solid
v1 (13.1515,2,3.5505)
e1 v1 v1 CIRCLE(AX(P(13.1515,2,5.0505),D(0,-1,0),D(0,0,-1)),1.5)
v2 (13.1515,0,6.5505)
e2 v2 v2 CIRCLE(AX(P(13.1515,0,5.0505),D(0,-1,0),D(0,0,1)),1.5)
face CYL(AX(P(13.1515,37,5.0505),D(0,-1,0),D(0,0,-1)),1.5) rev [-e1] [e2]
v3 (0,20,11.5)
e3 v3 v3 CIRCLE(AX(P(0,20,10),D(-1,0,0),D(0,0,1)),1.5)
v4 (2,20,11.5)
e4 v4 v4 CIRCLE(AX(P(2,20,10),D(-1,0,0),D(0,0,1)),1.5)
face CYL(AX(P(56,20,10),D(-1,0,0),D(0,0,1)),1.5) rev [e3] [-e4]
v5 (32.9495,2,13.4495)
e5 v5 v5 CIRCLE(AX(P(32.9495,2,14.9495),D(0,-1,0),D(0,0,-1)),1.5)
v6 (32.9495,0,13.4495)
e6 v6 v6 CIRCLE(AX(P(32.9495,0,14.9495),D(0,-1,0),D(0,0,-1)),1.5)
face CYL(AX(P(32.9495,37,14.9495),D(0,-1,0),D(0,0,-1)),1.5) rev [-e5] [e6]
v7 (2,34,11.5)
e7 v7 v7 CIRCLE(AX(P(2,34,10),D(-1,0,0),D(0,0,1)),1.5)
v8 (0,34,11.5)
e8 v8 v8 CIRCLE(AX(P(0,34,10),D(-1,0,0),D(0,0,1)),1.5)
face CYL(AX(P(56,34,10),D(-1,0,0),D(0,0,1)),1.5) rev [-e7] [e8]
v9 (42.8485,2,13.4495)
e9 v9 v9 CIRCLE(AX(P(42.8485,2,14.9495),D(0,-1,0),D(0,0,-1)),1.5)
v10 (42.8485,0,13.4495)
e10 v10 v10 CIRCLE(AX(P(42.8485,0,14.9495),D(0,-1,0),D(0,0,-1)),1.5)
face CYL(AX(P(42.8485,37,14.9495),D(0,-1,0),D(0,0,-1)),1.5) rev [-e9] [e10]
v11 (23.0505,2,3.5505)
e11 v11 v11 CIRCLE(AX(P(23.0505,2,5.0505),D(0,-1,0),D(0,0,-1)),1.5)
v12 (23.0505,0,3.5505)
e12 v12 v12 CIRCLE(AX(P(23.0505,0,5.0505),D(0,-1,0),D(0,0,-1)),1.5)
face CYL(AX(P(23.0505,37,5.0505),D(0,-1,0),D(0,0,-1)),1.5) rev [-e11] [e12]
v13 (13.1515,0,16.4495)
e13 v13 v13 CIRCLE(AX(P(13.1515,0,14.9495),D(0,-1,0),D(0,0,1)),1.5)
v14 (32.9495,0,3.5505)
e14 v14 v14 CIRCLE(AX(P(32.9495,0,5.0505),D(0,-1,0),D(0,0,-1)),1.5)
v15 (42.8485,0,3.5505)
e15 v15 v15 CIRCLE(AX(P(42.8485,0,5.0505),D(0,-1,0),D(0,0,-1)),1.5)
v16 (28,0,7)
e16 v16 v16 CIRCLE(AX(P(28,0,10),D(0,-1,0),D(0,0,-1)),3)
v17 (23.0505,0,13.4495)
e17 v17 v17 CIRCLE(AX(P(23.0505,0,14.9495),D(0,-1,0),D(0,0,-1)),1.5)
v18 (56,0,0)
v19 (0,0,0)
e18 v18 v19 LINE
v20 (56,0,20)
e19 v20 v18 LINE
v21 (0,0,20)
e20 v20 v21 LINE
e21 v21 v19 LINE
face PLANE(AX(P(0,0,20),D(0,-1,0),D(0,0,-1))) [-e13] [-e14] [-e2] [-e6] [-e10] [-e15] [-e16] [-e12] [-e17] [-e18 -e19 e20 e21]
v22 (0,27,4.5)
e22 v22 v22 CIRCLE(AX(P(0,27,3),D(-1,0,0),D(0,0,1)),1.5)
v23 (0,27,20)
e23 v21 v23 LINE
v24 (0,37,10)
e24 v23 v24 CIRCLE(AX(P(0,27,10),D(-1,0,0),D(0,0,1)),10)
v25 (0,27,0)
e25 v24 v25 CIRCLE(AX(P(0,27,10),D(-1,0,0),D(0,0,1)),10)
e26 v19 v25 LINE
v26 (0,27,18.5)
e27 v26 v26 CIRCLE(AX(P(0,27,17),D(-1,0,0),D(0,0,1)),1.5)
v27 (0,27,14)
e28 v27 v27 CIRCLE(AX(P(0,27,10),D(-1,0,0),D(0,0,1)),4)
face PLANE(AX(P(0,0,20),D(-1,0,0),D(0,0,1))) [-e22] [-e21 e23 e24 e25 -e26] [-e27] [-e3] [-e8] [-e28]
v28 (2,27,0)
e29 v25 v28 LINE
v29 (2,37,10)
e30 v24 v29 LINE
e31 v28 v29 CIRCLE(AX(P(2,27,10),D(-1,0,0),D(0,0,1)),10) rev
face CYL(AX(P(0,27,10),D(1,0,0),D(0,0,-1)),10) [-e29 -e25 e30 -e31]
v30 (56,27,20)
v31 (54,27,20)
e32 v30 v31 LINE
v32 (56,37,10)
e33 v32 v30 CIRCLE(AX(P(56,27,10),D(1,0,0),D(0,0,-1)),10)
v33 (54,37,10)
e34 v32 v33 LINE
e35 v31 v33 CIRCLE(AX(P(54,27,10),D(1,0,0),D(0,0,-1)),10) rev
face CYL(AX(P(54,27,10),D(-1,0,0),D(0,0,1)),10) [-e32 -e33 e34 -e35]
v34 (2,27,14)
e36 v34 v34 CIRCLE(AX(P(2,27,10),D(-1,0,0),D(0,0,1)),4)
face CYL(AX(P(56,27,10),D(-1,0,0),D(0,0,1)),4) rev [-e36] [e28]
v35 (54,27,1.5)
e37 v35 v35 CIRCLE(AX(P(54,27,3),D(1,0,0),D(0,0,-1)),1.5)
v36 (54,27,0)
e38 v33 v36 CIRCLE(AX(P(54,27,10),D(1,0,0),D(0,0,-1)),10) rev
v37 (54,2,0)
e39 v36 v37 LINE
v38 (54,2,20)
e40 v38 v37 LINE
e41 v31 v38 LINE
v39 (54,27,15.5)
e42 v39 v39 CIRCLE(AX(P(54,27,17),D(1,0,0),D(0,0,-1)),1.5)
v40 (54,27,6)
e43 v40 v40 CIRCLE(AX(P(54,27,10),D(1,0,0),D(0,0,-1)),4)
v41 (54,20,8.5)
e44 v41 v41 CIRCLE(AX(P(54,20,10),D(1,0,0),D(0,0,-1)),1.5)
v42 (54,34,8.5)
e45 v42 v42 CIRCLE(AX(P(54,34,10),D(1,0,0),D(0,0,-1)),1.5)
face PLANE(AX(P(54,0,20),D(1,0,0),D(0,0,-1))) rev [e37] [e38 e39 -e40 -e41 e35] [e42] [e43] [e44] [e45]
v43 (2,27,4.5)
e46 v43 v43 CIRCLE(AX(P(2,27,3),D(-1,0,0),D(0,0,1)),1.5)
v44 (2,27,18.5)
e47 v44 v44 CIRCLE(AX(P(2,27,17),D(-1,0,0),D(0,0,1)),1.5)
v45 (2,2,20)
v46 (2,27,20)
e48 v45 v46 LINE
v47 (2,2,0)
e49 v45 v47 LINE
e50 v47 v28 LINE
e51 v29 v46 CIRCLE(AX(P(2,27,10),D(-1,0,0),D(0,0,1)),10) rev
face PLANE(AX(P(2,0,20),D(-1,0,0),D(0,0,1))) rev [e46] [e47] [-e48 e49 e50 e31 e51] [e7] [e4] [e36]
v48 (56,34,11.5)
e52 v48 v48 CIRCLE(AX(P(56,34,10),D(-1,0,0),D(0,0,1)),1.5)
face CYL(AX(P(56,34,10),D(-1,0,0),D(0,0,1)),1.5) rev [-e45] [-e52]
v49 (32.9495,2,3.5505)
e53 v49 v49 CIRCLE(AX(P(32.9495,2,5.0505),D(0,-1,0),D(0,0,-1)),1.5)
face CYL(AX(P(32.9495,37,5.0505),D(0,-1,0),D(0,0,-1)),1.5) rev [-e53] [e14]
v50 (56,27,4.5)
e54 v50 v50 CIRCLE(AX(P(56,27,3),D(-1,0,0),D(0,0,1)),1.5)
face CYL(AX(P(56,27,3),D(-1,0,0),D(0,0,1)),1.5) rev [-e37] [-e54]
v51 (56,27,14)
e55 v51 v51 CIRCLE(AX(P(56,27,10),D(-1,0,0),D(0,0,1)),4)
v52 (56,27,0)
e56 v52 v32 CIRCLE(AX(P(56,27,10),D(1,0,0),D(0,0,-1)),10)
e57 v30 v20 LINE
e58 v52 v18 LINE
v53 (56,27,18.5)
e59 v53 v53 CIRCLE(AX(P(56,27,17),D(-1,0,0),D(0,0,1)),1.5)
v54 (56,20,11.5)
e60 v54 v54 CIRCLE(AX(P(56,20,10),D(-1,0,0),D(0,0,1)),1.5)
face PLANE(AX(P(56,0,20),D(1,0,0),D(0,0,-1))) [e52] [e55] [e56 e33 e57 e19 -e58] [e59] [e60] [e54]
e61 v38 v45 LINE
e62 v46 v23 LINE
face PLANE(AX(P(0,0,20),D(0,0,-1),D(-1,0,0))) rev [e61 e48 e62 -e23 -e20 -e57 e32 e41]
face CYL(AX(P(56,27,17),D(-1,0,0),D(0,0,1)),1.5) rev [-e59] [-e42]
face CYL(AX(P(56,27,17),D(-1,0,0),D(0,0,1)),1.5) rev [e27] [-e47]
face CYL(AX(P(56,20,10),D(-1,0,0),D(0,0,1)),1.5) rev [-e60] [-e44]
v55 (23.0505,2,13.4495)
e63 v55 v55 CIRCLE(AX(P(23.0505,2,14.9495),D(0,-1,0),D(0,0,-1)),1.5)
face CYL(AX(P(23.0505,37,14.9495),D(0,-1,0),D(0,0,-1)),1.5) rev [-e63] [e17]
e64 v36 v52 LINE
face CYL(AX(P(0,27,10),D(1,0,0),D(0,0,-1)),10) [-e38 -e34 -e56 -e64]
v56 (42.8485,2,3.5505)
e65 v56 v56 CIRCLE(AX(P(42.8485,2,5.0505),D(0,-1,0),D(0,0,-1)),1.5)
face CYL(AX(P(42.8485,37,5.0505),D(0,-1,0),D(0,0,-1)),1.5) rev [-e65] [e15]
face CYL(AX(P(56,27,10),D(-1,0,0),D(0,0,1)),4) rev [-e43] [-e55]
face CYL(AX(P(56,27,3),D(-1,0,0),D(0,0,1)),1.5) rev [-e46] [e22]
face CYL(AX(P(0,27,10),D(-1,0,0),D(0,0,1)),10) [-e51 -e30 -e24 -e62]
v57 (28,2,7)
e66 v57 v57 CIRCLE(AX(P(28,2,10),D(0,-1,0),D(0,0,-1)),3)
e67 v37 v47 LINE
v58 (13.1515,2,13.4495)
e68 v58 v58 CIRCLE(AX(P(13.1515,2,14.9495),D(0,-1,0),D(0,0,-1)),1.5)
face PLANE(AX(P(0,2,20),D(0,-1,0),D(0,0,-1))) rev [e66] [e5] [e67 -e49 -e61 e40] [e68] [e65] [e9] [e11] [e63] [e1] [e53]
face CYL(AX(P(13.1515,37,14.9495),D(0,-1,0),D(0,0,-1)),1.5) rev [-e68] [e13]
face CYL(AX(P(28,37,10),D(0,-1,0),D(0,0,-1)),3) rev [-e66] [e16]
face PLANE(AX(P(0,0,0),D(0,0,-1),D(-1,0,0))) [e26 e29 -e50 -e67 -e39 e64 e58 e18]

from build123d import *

# Parameters (mm, degrees)
EXTRUDE_1_DEPTH     = 20
FILLET_1_R          = 10
SKETCH_2_R          = 1.5
SKETCH_2_R_2        = 4
CUT_EXTRUDE_1_DEPTH = 71.03570518
SKETCH_3_R          = 3
SKETCH_3_R_2        = 1.5
CUT_EXTRUDE_2_DEPTH = 71.03570518


with BuildPart() as part:
    # 草图1 → 拉伸-薄壁1 (new body)
    with BuildSketch(Plane.XY):
        Polygon((0, 37), (0, 0), (56, 0), (56, 37), (54, 37), (54, 2), (2, 2), (2, 37), align=None)
    extrude(amount=EXTRUDE_1_DEPTH)

    # 圆角1
    fillet_1_edges = [part.edges().sort_by_distance(p)[0] for p in [
        (55, 37, 20),
        (55, 37, 0),
        (1, 37, 0),
        (1, 37, 20),
    ]]
    fillet(fillet_1_edges, radius=FILLET_1_R - 0.0001)  # a hair under: the kernel refuses the full size

    # 草图2 → 切除-拉伸1 (cut, through all)
    with BuildSketch(Plane.ZY):
        with Locations((10, 34)):
            Circle(SKETCH_2_R)
        with Locations((17, 27)):
            Circle(SKETCH_2_R)
        with Locations((10, 20)):
            Circle(SKETCH_2_R)
        with Locations((3, 27)):
            Circle(SKETCH_2_R)
        with Locations((10, 27)):
            Circle(SKETCH_2_R_2)
    extrude(amount=-CUT_EXTRUDE_1_DEPTH, mode=Mode.SUBTRACT)

    # 草图3 → 切除-拉伸2 (cut, through all)
    with BuildSketch(Plane.XZ):
        with Locations(Location((28, 10, 0), (0, 0, 270))):
            Circle(SKETCH_3_R)
        with Locations(Location((32.9495, 14.9495, 0), (0, 0, 270))):
            Circle(SKETCH_3_R_2)
        with Locations(Location((23.0505, 14.9495, 0), (0, 0, 270))):
            Circle(SKETCH_3_R_2)
        with Locations(Location((23.0505, 5.0505, 0), (0, 0, 270))):
            Circle(SKETCH_3_R_2)
        with Locations(Location((32.9495, 5.0505, 0), (0, 0, 270))):
            Circle(SKETCH_3_R_2)
        with Locations(Location((42.8485, 14.9495, 0), (0, 0, 270))):
            Circle(SKETCH_3_R_2)
        with Locations(Location((42.8485, 5.0505, 0), (0, 0, 270))):
            Circle(SKETCH_3_R_2)
        with Locations(Location((13.1515, 5.0505, 0), (0, 0, 270))):
            Circle(SKETCH_3_R_2)
        with Locations(Location((13.1515, 14.9495, 0), (0, 0, 270))):
            Circle(SKETCH_3_R_2)
    extrude(amount=-CUT_EXTRUDE_2_DEPTH, mode=Mode.SUBTRACT)


solid = part.part
